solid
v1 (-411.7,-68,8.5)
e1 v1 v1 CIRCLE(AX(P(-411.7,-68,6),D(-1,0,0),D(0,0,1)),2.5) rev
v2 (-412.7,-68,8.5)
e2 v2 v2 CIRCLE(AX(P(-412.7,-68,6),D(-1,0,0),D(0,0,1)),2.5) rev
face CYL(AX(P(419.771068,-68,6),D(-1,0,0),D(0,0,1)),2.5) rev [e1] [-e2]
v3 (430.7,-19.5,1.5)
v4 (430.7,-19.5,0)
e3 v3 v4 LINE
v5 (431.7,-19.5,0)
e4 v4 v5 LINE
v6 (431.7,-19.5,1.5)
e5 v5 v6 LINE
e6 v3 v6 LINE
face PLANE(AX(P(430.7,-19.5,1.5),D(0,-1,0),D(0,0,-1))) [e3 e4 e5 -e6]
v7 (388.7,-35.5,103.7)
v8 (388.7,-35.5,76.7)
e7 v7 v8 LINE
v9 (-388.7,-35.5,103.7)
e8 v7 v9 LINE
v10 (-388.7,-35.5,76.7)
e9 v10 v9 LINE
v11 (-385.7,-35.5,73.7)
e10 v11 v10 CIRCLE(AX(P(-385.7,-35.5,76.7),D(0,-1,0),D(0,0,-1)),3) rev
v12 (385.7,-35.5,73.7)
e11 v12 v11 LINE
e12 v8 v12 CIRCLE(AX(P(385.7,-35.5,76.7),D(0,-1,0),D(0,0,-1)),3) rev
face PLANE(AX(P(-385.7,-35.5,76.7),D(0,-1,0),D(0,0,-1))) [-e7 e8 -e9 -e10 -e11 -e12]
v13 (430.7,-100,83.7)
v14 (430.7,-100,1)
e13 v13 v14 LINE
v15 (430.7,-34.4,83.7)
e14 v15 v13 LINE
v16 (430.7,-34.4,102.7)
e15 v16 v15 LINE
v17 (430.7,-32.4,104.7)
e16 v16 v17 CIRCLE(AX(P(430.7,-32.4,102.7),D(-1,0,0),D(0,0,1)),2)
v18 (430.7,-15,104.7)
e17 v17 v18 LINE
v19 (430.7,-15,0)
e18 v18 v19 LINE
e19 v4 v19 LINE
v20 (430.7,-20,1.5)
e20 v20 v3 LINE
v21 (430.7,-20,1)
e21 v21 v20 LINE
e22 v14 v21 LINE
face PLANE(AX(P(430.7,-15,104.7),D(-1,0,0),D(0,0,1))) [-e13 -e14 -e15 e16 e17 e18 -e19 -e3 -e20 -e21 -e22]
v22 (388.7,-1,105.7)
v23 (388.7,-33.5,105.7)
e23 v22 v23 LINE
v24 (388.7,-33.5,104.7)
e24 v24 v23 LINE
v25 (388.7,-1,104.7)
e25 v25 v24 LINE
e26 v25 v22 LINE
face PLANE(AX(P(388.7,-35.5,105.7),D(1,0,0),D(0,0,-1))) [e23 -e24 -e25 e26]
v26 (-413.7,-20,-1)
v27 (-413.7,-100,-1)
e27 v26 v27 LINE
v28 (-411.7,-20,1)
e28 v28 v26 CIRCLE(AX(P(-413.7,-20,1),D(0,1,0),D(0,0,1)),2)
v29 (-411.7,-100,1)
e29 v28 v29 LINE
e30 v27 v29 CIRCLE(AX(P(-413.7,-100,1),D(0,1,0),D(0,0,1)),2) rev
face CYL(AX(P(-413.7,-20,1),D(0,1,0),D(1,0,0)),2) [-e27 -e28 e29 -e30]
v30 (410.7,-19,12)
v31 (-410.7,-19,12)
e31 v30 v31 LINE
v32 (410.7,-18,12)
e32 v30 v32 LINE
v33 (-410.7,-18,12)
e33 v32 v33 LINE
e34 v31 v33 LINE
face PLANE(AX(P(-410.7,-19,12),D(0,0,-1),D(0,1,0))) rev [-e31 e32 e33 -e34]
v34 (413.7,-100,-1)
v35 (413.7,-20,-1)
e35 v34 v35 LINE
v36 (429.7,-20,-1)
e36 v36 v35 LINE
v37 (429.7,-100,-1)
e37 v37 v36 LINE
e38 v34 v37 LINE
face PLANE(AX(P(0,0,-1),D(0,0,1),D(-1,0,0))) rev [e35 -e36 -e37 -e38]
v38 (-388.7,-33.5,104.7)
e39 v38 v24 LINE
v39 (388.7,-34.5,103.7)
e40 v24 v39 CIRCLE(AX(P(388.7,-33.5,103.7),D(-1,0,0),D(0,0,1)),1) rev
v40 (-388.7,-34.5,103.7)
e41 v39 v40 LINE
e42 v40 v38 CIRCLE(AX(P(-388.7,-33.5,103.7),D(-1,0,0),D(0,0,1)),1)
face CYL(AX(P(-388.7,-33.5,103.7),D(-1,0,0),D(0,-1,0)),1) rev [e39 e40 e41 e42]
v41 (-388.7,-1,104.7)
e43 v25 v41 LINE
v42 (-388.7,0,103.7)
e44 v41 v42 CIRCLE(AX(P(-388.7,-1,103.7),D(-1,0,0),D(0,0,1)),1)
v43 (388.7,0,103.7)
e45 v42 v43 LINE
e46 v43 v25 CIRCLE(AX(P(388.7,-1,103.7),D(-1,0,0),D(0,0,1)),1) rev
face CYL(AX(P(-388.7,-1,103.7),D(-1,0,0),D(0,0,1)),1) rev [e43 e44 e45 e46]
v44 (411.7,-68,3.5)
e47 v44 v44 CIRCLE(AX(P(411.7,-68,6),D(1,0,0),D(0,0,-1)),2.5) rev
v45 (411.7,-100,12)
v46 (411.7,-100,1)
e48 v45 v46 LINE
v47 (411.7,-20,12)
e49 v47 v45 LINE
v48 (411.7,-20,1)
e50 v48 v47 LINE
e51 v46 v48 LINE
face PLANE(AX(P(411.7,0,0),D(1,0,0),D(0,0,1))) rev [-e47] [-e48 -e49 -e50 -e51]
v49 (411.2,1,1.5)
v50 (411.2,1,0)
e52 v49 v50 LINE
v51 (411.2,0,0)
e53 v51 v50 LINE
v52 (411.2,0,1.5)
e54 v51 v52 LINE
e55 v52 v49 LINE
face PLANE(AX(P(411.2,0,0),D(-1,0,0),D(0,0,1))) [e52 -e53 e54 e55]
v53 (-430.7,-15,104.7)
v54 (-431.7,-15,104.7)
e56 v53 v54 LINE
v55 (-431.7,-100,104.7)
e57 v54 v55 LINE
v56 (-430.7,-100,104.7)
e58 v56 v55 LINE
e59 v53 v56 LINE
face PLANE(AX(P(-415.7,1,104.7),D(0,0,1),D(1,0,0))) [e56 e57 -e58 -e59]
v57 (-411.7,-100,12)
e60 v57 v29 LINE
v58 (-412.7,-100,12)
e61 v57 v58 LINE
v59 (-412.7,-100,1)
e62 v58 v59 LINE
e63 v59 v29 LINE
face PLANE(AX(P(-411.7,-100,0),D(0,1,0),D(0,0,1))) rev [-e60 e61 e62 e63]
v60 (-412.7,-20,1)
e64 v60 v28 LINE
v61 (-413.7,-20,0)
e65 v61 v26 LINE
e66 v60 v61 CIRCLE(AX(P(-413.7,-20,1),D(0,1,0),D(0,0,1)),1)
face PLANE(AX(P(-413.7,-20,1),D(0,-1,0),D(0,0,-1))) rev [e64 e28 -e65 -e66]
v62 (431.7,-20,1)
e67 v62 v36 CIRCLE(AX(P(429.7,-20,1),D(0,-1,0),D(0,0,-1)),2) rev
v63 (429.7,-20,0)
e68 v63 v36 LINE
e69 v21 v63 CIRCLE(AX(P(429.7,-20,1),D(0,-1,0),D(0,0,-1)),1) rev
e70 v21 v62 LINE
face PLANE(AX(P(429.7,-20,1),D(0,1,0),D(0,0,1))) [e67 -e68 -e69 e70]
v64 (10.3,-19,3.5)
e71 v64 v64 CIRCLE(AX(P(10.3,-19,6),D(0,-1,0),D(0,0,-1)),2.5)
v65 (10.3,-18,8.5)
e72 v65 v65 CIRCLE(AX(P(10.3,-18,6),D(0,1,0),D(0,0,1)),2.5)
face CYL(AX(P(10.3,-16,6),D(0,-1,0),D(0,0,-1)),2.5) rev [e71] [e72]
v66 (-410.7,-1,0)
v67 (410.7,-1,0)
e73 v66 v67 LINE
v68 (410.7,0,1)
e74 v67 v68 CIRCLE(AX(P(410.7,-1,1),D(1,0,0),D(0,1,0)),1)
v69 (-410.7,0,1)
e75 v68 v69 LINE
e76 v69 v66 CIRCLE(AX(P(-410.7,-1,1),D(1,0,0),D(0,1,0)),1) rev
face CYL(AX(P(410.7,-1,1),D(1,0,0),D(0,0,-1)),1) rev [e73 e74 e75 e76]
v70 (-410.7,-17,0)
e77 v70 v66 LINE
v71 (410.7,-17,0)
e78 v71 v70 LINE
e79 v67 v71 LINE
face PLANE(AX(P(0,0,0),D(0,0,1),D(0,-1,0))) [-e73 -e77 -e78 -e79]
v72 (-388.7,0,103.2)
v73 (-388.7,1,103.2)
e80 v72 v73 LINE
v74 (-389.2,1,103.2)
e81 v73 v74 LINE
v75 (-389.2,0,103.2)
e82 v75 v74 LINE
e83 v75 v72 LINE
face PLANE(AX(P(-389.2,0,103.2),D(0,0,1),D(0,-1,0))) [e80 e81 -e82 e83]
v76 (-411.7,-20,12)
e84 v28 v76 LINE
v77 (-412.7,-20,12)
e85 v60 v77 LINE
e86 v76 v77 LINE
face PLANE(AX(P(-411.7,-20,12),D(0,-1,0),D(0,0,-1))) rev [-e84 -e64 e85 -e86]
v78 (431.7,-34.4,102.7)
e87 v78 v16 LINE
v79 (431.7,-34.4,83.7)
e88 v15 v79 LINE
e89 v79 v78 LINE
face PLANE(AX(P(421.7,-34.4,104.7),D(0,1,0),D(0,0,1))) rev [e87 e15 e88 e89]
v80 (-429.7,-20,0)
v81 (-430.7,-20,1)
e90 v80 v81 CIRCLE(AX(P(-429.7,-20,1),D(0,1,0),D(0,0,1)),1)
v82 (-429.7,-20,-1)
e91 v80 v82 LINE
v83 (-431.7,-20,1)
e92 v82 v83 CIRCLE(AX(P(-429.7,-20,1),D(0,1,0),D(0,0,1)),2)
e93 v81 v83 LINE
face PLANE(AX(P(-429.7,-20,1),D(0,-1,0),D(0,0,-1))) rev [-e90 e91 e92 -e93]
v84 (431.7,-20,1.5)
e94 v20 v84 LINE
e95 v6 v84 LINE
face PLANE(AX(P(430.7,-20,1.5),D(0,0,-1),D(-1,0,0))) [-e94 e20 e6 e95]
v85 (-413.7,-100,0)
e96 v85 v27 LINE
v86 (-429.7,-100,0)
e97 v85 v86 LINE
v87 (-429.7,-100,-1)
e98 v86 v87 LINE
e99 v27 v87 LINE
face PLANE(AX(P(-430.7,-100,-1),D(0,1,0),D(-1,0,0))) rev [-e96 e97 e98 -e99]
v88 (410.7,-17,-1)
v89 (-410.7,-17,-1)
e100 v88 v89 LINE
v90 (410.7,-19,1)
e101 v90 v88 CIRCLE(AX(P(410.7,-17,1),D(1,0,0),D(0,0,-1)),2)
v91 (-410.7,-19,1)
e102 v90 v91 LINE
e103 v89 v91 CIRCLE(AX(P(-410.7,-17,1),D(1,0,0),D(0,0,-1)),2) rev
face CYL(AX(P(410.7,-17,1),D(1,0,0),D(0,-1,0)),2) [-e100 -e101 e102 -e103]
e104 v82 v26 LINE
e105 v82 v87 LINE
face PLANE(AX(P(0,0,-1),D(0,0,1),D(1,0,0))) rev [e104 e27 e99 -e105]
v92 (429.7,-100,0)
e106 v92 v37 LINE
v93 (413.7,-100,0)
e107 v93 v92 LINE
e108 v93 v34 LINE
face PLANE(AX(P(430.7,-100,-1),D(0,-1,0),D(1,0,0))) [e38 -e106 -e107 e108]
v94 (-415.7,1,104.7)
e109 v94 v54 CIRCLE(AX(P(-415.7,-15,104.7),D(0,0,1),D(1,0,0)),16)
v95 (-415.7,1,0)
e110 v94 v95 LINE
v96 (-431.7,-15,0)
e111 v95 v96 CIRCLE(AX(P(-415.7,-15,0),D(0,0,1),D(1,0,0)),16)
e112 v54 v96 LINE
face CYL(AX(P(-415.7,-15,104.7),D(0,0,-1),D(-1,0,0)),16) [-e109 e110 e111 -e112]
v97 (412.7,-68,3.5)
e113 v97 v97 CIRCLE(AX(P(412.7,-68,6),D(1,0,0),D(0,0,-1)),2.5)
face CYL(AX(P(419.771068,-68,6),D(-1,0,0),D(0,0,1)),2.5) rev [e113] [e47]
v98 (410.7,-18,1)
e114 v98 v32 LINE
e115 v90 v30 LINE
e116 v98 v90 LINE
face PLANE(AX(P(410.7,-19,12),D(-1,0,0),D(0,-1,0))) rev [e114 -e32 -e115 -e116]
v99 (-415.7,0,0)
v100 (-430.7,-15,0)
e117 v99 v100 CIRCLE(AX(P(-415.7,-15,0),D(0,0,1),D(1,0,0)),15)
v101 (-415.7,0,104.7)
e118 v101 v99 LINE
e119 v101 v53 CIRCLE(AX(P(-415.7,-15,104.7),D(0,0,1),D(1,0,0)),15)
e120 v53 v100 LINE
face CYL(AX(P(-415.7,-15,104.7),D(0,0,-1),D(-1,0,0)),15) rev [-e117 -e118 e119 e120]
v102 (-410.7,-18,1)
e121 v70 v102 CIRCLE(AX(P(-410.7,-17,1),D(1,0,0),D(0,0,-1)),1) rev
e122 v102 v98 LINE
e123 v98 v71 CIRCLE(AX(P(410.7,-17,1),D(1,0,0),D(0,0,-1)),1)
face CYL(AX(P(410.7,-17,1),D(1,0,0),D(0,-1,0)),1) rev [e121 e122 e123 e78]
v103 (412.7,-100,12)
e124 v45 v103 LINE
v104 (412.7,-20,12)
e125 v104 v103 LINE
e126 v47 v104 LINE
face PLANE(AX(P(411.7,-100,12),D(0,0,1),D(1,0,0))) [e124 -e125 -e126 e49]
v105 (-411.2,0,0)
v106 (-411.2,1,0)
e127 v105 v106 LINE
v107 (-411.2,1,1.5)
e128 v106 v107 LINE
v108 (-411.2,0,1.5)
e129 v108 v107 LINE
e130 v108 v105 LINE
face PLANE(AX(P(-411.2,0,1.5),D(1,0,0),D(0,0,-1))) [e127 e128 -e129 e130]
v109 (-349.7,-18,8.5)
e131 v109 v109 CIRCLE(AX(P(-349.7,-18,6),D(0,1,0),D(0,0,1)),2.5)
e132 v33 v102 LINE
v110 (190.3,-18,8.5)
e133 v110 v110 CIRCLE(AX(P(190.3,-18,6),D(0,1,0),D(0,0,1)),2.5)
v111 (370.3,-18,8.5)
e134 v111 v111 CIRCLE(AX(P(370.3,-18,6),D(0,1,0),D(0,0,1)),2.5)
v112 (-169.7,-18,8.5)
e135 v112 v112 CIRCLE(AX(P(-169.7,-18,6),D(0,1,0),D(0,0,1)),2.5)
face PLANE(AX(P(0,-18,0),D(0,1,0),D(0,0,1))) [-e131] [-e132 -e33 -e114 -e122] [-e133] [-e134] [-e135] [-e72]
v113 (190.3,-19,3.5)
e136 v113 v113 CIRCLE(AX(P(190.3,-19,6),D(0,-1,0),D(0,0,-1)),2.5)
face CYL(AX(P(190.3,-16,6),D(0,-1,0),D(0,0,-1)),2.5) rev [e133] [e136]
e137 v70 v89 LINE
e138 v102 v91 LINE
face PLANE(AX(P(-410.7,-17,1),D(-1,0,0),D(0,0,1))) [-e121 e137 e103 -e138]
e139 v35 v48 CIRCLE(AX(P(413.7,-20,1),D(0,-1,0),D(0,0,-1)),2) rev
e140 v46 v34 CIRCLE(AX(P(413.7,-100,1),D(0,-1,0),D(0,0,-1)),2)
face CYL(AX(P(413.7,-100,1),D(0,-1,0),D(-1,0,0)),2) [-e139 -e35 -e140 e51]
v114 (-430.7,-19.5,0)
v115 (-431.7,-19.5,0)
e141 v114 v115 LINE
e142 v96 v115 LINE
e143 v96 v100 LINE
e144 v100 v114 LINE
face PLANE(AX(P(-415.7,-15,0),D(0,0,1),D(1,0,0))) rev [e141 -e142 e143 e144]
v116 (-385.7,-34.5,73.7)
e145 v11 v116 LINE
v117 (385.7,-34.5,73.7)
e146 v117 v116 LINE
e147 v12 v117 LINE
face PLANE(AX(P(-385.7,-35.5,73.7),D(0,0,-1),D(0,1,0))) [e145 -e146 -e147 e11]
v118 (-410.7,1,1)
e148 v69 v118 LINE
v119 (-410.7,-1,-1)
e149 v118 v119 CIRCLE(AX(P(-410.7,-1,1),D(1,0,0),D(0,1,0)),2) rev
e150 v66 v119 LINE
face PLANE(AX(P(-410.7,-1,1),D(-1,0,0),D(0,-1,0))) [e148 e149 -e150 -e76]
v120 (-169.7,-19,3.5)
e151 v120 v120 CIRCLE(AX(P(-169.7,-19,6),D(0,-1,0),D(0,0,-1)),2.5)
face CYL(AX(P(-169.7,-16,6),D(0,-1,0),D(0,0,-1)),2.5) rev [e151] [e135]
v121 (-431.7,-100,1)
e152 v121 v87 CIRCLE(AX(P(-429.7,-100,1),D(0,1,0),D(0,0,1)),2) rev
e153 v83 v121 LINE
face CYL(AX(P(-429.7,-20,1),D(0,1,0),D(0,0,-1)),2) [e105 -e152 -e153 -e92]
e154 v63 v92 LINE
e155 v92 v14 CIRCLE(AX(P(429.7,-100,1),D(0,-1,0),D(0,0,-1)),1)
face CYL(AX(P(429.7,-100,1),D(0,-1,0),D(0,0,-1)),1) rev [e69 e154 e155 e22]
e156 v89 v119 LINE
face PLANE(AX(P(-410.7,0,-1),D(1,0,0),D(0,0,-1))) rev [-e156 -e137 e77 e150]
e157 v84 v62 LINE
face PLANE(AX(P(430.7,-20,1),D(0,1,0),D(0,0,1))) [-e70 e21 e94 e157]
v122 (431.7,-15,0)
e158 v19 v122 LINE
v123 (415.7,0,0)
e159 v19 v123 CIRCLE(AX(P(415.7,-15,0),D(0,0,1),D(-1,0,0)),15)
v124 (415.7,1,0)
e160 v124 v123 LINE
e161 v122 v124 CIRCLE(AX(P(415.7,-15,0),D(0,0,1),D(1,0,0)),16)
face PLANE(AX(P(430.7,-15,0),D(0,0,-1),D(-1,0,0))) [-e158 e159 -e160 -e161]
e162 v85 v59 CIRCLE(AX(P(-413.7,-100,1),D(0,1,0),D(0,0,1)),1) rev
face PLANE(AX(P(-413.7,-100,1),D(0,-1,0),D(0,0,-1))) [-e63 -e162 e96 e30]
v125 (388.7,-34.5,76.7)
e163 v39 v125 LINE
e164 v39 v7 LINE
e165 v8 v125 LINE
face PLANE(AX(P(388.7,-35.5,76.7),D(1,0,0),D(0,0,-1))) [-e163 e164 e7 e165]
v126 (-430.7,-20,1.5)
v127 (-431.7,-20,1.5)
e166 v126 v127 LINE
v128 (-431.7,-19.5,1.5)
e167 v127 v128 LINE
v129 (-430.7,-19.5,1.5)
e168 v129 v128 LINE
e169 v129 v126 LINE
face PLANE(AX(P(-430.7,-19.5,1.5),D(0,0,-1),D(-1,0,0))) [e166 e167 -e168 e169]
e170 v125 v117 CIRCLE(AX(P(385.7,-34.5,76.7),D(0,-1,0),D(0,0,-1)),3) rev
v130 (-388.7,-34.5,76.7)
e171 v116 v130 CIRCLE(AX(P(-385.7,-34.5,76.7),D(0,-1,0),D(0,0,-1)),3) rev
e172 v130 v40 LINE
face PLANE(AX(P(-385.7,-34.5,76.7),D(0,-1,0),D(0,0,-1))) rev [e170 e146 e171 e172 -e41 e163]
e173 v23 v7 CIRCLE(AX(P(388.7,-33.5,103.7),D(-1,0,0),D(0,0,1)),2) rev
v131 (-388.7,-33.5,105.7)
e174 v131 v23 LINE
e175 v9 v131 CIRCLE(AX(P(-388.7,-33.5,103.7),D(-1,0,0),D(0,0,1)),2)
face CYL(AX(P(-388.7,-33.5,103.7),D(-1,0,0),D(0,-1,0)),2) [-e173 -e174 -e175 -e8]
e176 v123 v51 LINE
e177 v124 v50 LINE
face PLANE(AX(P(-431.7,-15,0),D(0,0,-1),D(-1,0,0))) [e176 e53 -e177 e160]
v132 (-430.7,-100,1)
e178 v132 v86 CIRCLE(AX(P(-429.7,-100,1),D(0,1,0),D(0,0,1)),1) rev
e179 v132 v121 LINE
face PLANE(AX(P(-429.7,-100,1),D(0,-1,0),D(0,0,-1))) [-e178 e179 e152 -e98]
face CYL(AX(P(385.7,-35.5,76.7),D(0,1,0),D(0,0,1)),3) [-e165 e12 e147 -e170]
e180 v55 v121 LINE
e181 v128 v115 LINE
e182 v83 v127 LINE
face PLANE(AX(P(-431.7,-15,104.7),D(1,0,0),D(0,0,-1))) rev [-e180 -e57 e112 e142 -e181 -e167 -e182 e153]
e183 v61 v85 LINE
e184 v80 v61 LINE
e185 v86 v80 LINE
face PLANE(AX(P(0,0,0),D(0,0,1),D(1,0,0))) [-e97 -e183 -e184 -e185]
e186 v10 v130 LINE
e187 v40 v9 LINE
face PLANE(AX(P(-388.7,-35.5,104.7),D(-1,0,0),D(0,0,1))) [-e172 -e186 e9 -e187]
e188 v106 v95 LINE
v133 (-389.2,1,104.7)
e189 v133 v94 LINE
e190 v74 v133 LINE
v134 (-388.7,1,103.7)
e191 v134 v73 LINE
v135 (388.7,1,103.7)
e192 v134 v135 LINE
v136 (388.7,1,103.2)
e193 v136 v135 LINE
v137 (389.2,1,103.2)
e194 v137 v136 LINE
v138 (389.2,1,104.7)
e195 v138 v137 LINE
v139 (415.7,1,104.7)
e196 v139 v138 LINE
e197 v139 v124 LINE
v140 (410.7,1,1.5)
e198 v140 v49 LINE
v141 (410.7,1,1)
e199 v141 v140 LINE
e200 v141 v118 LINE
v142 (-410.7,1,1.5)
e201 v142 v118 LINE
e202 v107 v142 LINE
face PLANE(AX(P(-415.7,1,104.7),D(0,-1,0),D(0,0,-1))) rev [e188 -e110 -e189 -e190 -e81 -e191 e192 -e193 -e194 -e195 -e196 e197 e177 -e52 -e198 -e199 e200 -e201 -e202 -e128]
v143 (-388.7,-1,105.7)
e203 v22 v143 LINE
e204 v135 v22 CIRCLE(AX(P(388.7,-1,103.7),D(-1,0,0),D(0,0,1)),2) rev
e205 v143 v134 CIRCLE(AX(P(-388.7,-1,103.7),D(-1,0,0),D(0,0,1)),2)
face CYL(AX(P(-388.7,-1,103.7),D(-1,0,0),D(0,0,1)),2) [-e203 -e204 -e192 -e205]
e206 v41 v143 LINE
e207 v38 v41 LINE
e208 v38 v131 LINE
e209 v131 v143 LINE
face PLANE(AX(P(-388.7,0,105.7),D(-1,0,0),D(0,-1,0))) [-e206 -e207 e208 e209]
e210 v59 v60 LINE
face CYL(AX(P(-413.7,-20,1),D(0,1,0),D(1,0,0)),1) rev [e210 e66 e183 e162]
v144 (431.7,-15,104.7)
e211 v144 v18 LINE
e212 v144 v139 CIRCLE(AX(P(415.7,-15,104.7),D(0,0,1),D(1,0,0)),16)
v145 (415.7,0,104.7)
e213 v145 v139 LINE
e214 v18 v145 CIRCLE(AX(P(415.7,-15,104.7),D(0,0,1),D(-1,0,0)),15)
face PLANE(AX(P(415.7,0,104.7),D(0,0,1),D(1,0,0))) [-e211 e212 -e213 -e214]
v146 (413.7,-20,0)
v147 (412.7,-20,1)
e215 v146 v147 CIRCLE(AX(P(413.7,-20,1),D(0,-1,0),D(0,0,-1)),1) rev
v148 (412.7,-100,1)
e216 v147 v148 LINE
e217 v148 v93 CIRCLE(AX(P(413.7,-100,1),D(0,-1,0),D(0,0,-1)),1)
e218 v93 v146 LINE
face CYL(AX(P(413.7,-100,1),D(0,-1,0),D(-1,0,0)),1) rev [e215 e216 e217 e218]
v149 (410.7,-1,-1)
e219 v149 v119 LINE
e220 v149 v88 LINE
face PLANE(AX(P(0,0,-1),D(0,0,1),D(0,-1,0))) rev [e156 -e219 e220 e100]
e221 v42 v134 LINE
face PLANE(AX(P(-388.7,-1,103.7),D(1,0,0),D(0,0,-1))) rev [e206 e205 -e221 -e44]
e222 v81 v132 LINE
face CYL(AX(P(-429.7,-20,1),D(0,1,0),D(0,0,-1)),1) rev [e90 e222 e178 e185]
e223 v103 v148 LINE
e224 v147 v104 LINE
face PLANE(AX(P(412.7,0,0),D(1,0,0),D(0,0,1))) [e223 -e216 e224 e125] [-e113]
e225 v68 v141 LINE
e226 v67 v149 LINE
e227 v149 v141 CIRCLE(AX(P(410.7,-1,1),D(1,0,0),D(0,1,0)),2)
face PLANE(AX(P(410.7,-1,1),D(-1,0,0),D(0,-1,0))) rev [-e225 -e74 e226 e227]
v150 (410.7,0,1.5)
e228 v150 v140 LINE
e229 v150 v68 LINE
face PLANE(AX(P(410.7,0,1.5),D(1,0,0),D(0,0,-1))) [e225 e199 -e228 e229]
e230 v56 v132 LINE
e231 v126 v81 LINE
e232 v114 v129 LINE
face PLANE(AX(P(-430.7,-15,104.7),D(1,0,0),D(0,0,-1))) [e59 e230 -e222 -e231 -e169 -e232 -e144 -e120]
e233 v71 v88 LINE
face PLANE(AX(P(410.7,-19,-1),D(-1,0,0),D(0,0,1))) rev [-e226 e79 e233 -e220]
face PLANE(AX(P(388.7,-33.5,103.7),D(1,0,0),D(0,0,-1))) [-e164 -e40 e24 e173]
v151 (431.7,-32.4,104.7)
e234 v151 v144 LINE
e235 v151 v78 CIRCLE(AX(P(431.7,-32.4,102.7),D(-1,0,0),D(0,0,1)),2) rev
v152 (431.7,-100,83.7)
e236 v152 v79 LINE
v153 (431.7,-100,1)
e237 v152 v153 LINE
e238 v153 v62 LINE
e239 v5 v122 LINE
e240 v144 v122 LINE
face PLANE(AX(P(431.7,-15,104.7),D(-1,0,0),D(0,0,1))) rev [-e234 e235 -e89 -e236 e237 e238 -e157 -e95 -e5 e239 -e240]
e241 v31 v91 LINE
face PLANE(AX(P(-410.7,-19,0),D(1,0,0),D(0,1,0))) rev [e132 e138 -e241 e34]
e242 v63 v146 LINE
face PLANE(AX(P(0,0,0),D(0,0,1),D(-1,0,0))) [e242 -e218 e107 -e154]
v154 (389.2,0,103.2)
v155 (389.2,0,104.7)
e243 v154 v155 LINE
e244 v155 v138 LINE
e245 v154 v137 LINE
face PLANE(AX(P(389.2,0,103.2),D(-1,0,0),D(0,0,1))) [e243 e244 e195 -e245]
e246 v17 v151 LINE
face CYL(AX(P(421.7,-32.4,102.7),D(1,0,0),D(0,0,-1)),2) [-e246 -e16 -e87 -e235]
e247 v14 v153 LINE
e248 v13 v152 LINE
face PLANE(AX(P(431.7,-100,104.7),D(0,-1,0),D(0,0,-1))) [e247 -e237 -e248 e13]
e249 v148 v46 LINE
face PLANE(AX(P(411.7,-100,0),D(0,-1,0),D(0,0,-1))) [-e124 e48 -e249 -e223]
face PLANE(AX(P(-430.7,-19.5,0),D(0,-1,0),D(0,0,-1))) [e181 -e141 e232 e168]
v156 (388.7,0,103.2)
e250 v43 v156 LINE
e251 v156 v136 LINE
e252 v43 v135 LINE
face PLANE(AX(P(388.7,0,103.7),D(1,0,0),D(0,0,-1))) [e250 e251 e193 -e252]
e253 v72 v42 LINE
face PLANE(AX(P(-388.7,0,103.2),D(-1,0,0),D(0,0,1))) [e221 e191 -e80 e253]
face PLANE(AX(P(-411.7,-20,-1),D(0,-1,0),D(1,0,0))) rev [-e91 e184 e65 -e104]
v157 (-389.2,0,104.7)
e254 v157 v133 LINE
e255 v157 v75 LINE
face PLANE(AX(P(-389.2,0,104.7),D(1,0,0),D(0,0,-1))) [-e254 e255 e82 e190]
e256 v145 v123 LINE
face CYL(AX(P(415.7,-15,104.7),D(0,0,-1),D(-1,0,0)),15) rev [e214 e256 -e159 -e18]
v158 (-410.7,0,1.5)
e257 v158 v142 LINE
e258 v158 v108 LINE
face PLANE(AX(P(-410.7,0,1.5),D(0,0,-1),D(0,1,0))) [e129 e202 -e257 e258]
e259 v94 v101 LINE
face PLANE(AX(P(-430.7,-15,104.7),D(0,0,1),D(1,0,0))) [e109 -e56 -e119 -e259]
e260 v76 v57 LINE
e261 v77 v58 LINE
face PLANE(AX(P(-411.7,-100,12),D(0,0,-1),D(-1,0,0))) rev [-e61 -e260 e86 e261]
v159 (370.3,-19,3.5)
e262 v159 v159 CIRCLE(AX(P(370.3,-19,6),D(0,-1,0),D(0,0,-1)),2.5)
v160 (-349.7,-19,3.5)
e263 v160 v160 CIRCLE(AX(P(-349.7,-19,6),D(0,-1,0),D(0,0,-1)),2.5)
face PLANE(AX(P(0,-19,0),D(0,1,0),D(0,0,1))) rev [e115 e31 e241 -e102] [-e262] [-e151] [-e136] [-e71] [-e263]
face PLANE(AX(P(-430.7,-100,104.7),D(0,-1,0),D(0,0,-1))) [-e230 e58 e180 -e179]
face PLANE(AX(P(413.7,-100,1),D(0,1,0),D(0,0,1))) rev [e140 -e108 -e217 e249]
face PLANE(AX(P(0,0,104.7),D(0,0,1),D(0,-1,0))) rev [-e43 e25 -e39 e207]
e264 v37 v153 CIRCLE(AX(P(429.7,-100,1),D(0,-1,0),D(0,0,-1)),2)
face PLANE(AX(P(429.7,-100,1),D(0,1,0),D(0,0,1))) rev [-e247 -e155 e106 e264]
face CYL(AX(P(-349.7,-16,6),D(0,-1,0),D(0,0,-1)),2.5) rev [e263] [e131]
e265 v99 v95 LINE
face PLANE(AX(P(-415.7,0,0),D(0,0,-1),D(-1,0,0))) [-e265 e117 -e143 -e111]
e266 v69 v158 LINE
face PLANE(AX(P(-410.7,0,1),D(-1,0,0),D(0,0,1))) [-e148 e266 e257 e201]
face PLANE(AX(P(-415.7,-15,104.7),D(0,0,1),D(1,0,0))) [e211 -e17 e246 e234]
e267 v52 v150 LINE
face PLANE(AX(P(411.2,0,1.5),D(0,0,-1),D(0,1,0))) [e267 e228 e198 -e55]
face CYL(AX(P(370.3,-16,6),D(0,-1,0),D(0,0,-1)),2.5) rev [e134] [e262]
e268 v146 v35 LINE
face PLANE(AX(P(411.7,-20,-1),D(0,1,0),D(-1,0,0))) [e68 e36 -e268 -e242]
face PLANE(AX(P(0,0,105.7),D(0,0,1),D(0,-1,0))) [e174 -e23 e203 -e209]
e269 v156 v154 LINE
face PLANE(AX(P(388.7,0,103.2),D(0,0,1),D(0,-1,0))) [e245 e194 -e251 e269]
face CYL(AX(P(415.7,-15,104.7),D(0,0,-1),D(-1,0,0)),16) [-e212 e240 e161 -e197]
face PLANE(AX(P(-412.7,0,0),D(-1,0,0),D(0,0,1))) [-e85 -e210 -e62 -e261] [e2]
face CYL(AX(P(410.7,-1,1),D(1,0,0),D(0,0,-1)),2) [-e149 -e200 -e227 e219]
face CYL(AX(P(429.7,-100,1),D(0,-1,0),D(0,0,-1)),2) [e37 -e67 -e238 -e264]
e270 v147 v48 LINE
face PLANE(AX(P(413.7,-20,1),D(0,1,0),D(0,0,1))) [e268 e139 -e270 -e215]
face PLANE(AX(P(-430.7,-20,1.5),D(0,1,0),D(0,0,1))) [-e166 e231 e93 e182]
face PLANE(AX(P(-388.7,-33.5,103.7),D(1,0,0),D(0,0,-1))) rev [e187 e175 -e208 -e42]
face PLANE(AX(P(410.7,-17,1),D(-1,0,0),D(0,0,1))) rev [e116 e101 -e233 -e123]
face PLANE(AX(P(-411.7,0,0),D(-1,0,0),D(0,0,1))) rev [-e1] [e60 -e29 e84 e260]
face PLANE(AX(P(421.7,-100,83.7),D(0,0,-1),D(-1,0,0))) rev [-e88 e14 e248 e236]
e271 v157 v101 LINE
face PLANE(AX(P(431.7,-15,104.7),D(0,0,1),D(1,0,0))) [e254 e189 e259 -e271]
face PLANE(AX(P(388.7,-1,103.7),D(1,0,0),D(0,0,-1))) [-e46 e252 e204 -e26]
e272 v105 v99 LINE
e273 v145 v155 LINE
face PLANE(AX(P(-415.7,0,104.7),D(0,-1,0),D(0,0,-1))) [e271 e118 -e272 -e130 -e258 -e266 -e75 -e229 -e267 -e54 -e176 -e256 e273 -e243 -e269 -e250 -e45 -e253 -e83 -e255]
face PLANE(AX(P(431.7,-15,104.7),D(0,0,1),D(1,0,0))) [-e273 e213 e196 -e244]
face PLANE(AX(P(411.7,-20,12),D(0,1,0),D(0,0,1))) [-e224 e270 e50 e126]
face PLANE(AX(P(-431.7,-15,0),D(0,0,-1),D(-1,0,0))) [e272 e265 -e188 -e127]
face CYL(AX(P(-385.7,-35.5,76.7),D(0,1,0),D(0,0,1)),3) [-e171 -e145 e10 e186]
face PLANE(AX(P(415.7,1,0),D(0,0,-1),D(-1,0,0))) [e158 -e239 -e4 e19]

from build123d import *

# Parameters (mm, degrees)
BASE_FLANGE1_DEPTH             = 104.7
EDGE_FLANGE1_STRIP_W           = 6
EDGE_FLANGE1_STRIP_H           = 1
EDGE_FLANGE1_STRIP_CUT_DEPTH   = 821.4
EDGE_FLANGE1_RELIEF_W          = 6.5
EDGE_FLANGE1_RELIEF_H          = 0.5
EDGE_FLANGE1_RELIEF_CUT_DEPTH  = 1
EDGE_FLANGE1_DEPTH             = 821.4
EDGE_FLANGE2_STRIP_W           = 6
EDGE_FLANGE2_STRIP_H           = 1
EDGE_FLANGE2_STRIP_CUT_DEPTH   = 821.4
EDGE_FLANGE2_DEPTH             = 821.4
EDGE_FLANGE3_STRIP_W           = 6
EDGE_FLANGE3_STRIP_H           = 1
EDGE_FLANGE3_STRIP_CUT_DEPTH   = 80
EDGE_FLANGE3_RELIEF_W          = 6.5
EDGE_FLANGE3_RELIEF_H          = 0.5
EDGE_FLANGE3_RELIEF_CUT_DEPTH  = 1
EDGE_FLANGE3_DEPTH             = 80
EDGE_FLANGE4_STRIP_W           = 6
EDGE_FLANGE4_STRIP_H           = 1
EDGE_FLANGE4_STRIP_CUT_DEPTH   = 80
EDGE_FLANGE4_DEPTH             = 80
EDGE_FLANGE5_STRIP_W           = 6
EDGE_FLANGE5_STRIP_H           = 1
EDGE_FLANGE5_STRIP_CUT_DEPTH   = 777.4
EDGE_FLANGE5_RELIEF_W          = 6.5
EDGE_FLANGE5_RELIEF_H          = 0.5
EDGE_FLANGE5_RELIEF_CUT_DEPTH  = 1
EDGE_FLANGE5_DEPTH             = 777.4
SKETCH25_R                     = 2.5
CUT_EXTRUDE1_DEPTH             = 3
SKETCH26_R                     = 2.5
CUT_EXTRUDE2_DEPTH             = 3
CUT_EXTRUDE2_DIRECTION_2_REACH = 857.86
EDGE_FLANGE7_STRIP_W           = 6
EDGE_FLANGE7_STRIP_H           = 1
EDGE_FLANGE7_STRIP_CUT_DEPTH   = 777.4
EDGE_FLANGE7_DEPTH             = 777.4
EDGE_FLANGE7_FLAT_DEPTH        = 1
SKETCH30_W                     = 21
SKETCH30_H                     = 65.6
CUT_EXTRUDE3_DEPTH             = 10
FILLET1_R                      = 2


# Sheet-metal steps are written as plain solids
with BuildPart() as part:
    # Sketch1 → Base-Flange1 (new body)
    with BuildSketch(Plane.XY):
        with BuildLine():
            Line((-430.7, -100), (-430.7, -15))
            ThreePointArc((-430.7, -15), (-426.306601718, -4.393398282), (-415.7, 0))
            Line((-415.7, 0), (415.7, 0))
            ThreePointArc((415.7, 0), (426.306601718, -4.393398282), (430.7, -15))
            Line((430.7, -15), (430.7, -100))
            Line((430.7, -100), (431.7, -100))
            Line((431.7, -100), (431.7, -15))
            ThreePointArc((431.7, -15), (427.013708499, -3.686291501), (415.7, 1))
            Line((415.7, 1), (-415.7, 1))
            ThreePointArc((-415.7, 1), (-427.013708499, -3.686291501), (-431.7, -15))
            Line((-431.7, -15), (-431.7, -100))
            Line((-431.7, -100), (-430.7, -100))
        make_face()
    extrude(amount=BASE_FLANGE1_DEPTH)

    # Edge-Flange1 strip (across the edge) → Edge-Flange1 strip cut (cut)
    with BuildSketch(Plane(origin=(-410.7, 0, 0), x_dir=(0, 0, 1), z_dir=(1, 0, 0))):
        with Locations((-2, -0.5)):
            Rectangle(EDGE_FLANGE1_STRIP_W, EDGE_FLANGE1_STRIP_H)
    extrude(amount=EDGE_FLANGE1_STRIP_CUT_DEPTH, mode=Mode.SUBTRACT)

    # Edge-Flange1 relief (on the sheet) → Edge-Flange1 relief cut (cut)
    with BuildSketch(Plane(origin=(-410.7, 0, 1), x_dir=(0, 0, 1), z_dir=(0, -1, 0))):
        with Locations((-2.75, 0.25)):
            Rectangle(EDGE_FLANGE1_RELIEF_W, EDGE_FLANGE1_RELIEF_H)
        with Locations((-2.75, -821.65)):
            Rectangle(EDGE_FLANGE1_RELIEF_W, EDGE_FLANGE1_RELIEF_H)
    extrude(amount=-EDGE_FLANGE1_RELIEF_CUT_DEPTH, mode=Mode.SUBTRACT)

    # Edge-Flange1 section (across the edge) → Edge-Flange1 (add)
    with BuildSketch(Plane(origin=(-410.7, 0, 0), x_dir=(0, 0, 1), z_dir=(1, 0, 0))):
        with BuildLine():
            Line((-1, 1), (-1, 19))
            Line((-1, 19), (0, 19))
            Line((0, 19), (0, 1))
            ThreePointArc((0, 1), (0.292893219, 0.292893219), (1, 0))
            Line((1, 0), (1, -1))
            ThreePointArc((1, -1), (-0.414213562, -0.414213562), (-1, 1))
        make_face()
    extrude(amount=EDGE_FLANGE1_DEPTH)

    # Edge-Flange2 strip (across the edge) → Edge-Flange2 strip cut (cut)
    with BuildSketch(Plane(origin=(-410.7, -19, 0), x_dir=(0, 1, 0), z_dir=(1, 0, 0))):
        with Locations((-1, -0.5)):
            Rectangle(EDGE_FLANGE2_STRIP_W, EDGE_FLANGE2_STRIP_H)
    extrude(amount=EDGE_FLANGE2_STRIP_CUT_DEPTH, mode=Mode.SUBTRACT)

    # Edge-Flange2 section (across the edge) → Edge-Flange2 (add)
    with BuildSketch(Plane(origin=(-410.7, -19, 0), x_dir=(0, 1, 0), z_dir=(1, 0, 0))):
        with BuildLine():
            Line((0, 1), (0, 12))
            Line((0, 12), (1, 12))
            Line((1, 12), (1, 1))
            ThreePointArc((1, 1), (1.292893219, 0.292893219), (2, 0))
            Line((2, 0), (2, -1))
            ThreePointArc((2, -1), (0.585786438, -0.414213562), (0, 1))
        make_face()
    extrude(amount=EDGE_FLANGE2_DEPTH)

    # Edge-Flange3 strip (across the edge) → Edge-Flange3 strip cut (cut)
    with BuildSketch(Plane(origin=(-430.7, -100, 0), x_dir=(0, 0, 1), z_dir=(0, 1, 0))):
        with Locations((-2, -0.5)):
            Rectangle(EDGE_FLANGE3_STRIP_W, EDGE_FLANGE3_STRIP_H)
    edge_flange3_strip_cut = extrude(amount=EDGE_FLANGE3_STRIP_CUT_DEPTH, mode=Mode.SUBTRACT)

    # Edge-Flange3 relief (on the sheet) → Edge-Flange3 relief cut (cut)
    with BuildSketch(Plane(origin=(-430.7, -100, 1), x_dir=(0, 0, 1), z_dir=(1, 0, 0))):
        with Locations((-2.75, -80.25)):
            Rectangle(EDGE_FLANGE3_RELIEF_W, EDGE_FLANGE3_RELIEF_H)
    edge_flange3_relief_cut = extrude(amount=-EDGE_FLANGE3_RELIEF_CUT_DEPTH, mode=Mode.SUBTRACT)

    # Edge-Flange3 section (across the edge) → Edge-Flange3 (add)
    with BuildSketch(Plane(origin=(-430.7, -100, 0), x_dir=(0, 0, 1), z_dir=(0, 1, 0))):
        with BuildLine():
            Line((-1, 1), (-1, 19))
            Line((-1, 19), (0, 19))
            Line((0, 19), (0, 1))
            ThreePointArc((0, 1), (0.292893219, 0.292893219), (1, 0))
            Line((1, 0), (1, -1))
            ThreePointArc((1, -1), (-0.414213562, -0.414213562), (-1, 1))
        make_face()
    edge_flange3 = extrude(amount=EDGE_FLANGE3_DEPTH)

    # Edge-Flange4 strip (across the edge) → Edge-Flange4 strip cut (cut)
    with BuildSketch(Plane(origin=(-411.7, -100, 0), x_dir=(-1, 0, 0), z_dir=(0, 1, 0))):
        with Locations((-1, -0.5)):
            Rectangle(EDGE_FLANGE4_STRIP_W, EDGE_FLANGE4_STRIP_H)
    edge_flange4_strip_cut = extrude(amount=EDGE_FLANGE4_STRIP_CUT_DEPTH, mode=Mode.SUBTRACT)

    # Edge-Flange4 section (across the edge) → Edge-Flange4 (add)
    with BuildSketch(Plane(origin=(-411.7, -100, 0), x_dir=(-1, 0, 0), z_dir=(0, 1, 0))):
        with BuildLine():
            Line((0, 1), (0, 12))
            Line((0, 12), (1, 12))
            Line((1, 12), (1, 1))
            ThreePointArc((1, 1), (1.292893219, 0.292893219), (2, 0))
            Line((2, 0), (2, -1))
            ThreePointArc((2, -1), (0.585786438, -0.414213562), (0, 1))
        make_face()
    edge_flange4 = extrude(amount=EDGE_FLANGE4_DEPTH)

    # Mirror1: Edge-Flange3 strip cut, Edge-Flange3 relief cut, Edge-Flange3, Edge-Flange4 strip cut, Edge-Flange4 across plane
    add(edge_flange3_strip_cut.mirror(Plane(origin=(0, 0, 0), x_dir=(0, 0, 1), z_dir=(1, 0, 0))), mode=Mode.SUBTRACT)
    add(edge_flange3_relief_cut.mirror(Plane(origin=(0, 0, 0), x_dir=(0, 0, 1), z_dir=(1, 0, 0))), mode=Mode.SUBTRACT)
    add(edge_flange3.mirror(Plane(origin=(0, 0, 0), x_dir=(0, 0, 1), z_dir=(1, 0, 0))))
    add(edge_flange4_strip_cut.mirror(Plane(origin=(0, 0, 0), x_dir=(0, 0, 1), z_dir=(1, 0, 0))), mode=Mode.SUBTRACT)
    add(edge_flange4.mirror(Plane(origin=(0, 0, 0), x_dir=(0, 0, 1), z_dir=(1, 0, 0))))

    # Edge-Flange5 strip (across the edge) → Edge-Flange5 strip cut (cut)
    with BuildSketch(Plane(origin=(388.7, 0, 104.7), x_dir=(0, 0, -1), z_dir=(-1, 0, 0))):
        with Locations((-2, -0.5)):
            Rectangle(EDGE_FLANGE5_STRIP_W, EDGE_FLANGE5_STRIP_H)
    extrude(amount=EDGE_FLANGE5_STRIP_CUT_DEPTH, mode=Mode.SUBTRACT)

    # Edge-Flange5 relief (on the sheet) → Edge-Flange5 relief cut (cut)
    with BuildSketch(Plane(origin=(388.7, 0, 103.7), x_dir=(0, 0, -1), z_dir=(0, -1, 0))):
        with Locations((-2.75, 0.25)):
            Rectangle(EDGE_FLANGE5_RELIEF_W, EDGE_FLANGE5_RELIEF_H)
        with Locations((-2.75, -777.65)):
            Rectangle(EDGE_FLANGE5_RELIEF_W, EDGE_FLANGE5_RELIEF_H)
    extrude(amount=-EDGE_FLANGE5_RELIEF_CUT_DEPTH, mode=Mode.SUBTRACT)

    # Edge-Flange5 section (across the edge) → Edge-Flange5 (add)
    with BuildSketch(Plane(origin=(388.7, 0, 104.7), x_dir=(0, 0, -1), z_dir=(-1, 0, 0))):
        with BuildLine():
            Line((-1, 1), (-1, 35.5))
            Line((-1, 35.5), (0, 35.5))
            Line((0, 35.5), (0, 1))
            ThreePointArc((0, 1), (0.292893219, 0.292893219), (1, 0))
            Line((1, 0), (1, -1))
            ThreePointArc((1, -1), (-0.414213562, -0.414213562), (-1, 1))
        make_face()
    extrude(amount=EDGE_FLANGE5_DEPTH)

    # Sketch25 → Cut-Extrude1 (cut)
    with BuildSketch(Plane.XZ.offset(19)):
        with Locations(Location((-349.7, 6, 0), (0, 0, 270))):
            Circle(SKETCH25_R)
        with Locations(Location((-169.7, 6, 0), (0, 0, 270))):
            Circle(SKETCH25_R)
        with Locations(Location((10.3, 6, 0), (0, 0, 270))):
            Circle(SKETCH25_R)
        with Locations(Location((190.3, 6, 0), (0, 0, 270))):
            Circle(SKETCH25_R)
        with Locations(Location((370.3, 6, 0), (0, 0, 270))):
            Circle(SKETCH25_R)
        with Locations((550.3, 6)):
            Circle(SKETCH25_R)
        with Locations((730.3, 6)):
            Circle(SKETCH25_R)
    extrude(amount=-CUT_EXTRUDE1_DEPTH, mode=Mode.SUBTRACT)

    # Sketch26 → Cut-Extrude2 (cut)
    with BuildSketch(Plane(origin=(-411.7, 0, 0), x_dir=(0, 0, -1), z_dir=(1, 0, 0))):
        with Locations((-6, -68)):
            Circle(SKETCH26_R)
    extrude(amount=-CUT_EXTRUDE2_DEPTH, mode=Mode.SUBTRACT)

    # Cut-Extrude2 direction 2: up to this face of the body (flat: up to its plane)
    cut_extrude2_direction_2_end = Plane(part.part.faces().sort_by_distance((412.7, -60, 6.5))[0])
    # Sketch26 → Cut-Extrude2 direction 2 (cut, up to the picked face)
    with BuildSketch(Plane(origin=(-411.7, 0, 0), x_dir=(0, 0, -1), z_dir=(1, 0, 0)), mode=Mode.PRIVATE) as cut_extrude2_direction_2_sk1:
        with Locations((-6, -68)):
            Circle(SKETCH26_R)
    cut_extrude2_direction_2_tool1 = split(extrude(cut_extrude2_direction_2_sk1.sketch, amount=CUT_EXTRUDE2_DIRECTION_2_REACH, mode=Mode.PRIVATE), bisect_by=cut_extrude2_direction_2_end, keep=Keep.BOTH, mode=Mode.PRIVATE)
    add(cut_extrude2_direction_2_tool1.solids().sort_by(Axis((-411.7, -68, 6), (1, 0, 0)))[0], mode=Mode.SUBTRACT)

    # Edge-Flange7 strip (across the edge) → Edge-Flange7 strip cut (cut)
    with BuildSketch(Plane(origin=(388.7, -35.5, 104.7), x_dir=(0, 1, 0), z_dir=(-1, 0, 0))):
        with Locations((-1, -0.5)):
            Rectangle(EDGE_FLANGE7_STRIP_W, EDGE_FLANGE7_STRIP_H)
    extrude(amount=EDGE_FLANGE7_STRIP_CUT_DEPTH, mode=Mode.SUBTRACT)

    # Edge-Flange7 bend section (across the edge) → Edge-Flange7 (add)
    with BuildSketch(Plane(origin=(388.7, -35.5, 104.7), x_dir=(0, 1, 0), z_dir=(-1, 0, 0))):
        with BuildLine():
            Line((0, 1), (1, 1))
            ThreePointArc((1, 1), (1.292893219, 0.292893219), (2, 0))
            Line((2, 0), (2, -1))
            ThreePointArc((2, -1), (0.585786438, -0.414213562), (0, 1))
        make_face()
    extrude(amount=EDGE_FLANGE7_DEPTH)

    # Edge-Flange7 profile (on flange) → Edge-Flange7 flat (add)
    with BuildSketch(Plane(origin=(0, -35.5, 104.7), x_dir=(1, 0, 0), z_dir=(0, 1, 0))):
        with BuildLine():
            Line((-388.7, 1), (388.7, 1))
            Line((388.7, 1), (388.7, 28))
            ThreePointArc((388.7, 28), (387.821320344, 30.121320344), (385.7, 31))
            Line((385.7, 31), (-385.7, 31))
            ThreePointArc((-385.7, 31), (-387.821320344, 30.121320344), (-388.7, 28))
            Line((-388.7, 28), (-388.7, 1))
        make_face()
    extrude(amount=EDGE_FLANGE7_FLAT_DEPTH)

    # Sketch30 → Cut-Extrude3 (cut)
    with BuildSketch(Plane(origin=(431.7, 0, 0), x_dir=(0, 0, -1), z_dir=(1, 0, 0))):
        with Locations((-94.2, -67.2)):
            Rectangle(SKETCH30_W, SKETCH30_H)
    extrude(amount=-CUT_EXTRUDE3_DEPTH, mode=Mode.SUBTRACT)

    # Fillet1
    fillet1_edges = [part.edges().sort_by_distance(p)[0] for p in [
        (431.2, -34.4, 104.7),
    ]]
    fillet(fillet1_edges, radius=FILLET1_R)


solid = part.part
